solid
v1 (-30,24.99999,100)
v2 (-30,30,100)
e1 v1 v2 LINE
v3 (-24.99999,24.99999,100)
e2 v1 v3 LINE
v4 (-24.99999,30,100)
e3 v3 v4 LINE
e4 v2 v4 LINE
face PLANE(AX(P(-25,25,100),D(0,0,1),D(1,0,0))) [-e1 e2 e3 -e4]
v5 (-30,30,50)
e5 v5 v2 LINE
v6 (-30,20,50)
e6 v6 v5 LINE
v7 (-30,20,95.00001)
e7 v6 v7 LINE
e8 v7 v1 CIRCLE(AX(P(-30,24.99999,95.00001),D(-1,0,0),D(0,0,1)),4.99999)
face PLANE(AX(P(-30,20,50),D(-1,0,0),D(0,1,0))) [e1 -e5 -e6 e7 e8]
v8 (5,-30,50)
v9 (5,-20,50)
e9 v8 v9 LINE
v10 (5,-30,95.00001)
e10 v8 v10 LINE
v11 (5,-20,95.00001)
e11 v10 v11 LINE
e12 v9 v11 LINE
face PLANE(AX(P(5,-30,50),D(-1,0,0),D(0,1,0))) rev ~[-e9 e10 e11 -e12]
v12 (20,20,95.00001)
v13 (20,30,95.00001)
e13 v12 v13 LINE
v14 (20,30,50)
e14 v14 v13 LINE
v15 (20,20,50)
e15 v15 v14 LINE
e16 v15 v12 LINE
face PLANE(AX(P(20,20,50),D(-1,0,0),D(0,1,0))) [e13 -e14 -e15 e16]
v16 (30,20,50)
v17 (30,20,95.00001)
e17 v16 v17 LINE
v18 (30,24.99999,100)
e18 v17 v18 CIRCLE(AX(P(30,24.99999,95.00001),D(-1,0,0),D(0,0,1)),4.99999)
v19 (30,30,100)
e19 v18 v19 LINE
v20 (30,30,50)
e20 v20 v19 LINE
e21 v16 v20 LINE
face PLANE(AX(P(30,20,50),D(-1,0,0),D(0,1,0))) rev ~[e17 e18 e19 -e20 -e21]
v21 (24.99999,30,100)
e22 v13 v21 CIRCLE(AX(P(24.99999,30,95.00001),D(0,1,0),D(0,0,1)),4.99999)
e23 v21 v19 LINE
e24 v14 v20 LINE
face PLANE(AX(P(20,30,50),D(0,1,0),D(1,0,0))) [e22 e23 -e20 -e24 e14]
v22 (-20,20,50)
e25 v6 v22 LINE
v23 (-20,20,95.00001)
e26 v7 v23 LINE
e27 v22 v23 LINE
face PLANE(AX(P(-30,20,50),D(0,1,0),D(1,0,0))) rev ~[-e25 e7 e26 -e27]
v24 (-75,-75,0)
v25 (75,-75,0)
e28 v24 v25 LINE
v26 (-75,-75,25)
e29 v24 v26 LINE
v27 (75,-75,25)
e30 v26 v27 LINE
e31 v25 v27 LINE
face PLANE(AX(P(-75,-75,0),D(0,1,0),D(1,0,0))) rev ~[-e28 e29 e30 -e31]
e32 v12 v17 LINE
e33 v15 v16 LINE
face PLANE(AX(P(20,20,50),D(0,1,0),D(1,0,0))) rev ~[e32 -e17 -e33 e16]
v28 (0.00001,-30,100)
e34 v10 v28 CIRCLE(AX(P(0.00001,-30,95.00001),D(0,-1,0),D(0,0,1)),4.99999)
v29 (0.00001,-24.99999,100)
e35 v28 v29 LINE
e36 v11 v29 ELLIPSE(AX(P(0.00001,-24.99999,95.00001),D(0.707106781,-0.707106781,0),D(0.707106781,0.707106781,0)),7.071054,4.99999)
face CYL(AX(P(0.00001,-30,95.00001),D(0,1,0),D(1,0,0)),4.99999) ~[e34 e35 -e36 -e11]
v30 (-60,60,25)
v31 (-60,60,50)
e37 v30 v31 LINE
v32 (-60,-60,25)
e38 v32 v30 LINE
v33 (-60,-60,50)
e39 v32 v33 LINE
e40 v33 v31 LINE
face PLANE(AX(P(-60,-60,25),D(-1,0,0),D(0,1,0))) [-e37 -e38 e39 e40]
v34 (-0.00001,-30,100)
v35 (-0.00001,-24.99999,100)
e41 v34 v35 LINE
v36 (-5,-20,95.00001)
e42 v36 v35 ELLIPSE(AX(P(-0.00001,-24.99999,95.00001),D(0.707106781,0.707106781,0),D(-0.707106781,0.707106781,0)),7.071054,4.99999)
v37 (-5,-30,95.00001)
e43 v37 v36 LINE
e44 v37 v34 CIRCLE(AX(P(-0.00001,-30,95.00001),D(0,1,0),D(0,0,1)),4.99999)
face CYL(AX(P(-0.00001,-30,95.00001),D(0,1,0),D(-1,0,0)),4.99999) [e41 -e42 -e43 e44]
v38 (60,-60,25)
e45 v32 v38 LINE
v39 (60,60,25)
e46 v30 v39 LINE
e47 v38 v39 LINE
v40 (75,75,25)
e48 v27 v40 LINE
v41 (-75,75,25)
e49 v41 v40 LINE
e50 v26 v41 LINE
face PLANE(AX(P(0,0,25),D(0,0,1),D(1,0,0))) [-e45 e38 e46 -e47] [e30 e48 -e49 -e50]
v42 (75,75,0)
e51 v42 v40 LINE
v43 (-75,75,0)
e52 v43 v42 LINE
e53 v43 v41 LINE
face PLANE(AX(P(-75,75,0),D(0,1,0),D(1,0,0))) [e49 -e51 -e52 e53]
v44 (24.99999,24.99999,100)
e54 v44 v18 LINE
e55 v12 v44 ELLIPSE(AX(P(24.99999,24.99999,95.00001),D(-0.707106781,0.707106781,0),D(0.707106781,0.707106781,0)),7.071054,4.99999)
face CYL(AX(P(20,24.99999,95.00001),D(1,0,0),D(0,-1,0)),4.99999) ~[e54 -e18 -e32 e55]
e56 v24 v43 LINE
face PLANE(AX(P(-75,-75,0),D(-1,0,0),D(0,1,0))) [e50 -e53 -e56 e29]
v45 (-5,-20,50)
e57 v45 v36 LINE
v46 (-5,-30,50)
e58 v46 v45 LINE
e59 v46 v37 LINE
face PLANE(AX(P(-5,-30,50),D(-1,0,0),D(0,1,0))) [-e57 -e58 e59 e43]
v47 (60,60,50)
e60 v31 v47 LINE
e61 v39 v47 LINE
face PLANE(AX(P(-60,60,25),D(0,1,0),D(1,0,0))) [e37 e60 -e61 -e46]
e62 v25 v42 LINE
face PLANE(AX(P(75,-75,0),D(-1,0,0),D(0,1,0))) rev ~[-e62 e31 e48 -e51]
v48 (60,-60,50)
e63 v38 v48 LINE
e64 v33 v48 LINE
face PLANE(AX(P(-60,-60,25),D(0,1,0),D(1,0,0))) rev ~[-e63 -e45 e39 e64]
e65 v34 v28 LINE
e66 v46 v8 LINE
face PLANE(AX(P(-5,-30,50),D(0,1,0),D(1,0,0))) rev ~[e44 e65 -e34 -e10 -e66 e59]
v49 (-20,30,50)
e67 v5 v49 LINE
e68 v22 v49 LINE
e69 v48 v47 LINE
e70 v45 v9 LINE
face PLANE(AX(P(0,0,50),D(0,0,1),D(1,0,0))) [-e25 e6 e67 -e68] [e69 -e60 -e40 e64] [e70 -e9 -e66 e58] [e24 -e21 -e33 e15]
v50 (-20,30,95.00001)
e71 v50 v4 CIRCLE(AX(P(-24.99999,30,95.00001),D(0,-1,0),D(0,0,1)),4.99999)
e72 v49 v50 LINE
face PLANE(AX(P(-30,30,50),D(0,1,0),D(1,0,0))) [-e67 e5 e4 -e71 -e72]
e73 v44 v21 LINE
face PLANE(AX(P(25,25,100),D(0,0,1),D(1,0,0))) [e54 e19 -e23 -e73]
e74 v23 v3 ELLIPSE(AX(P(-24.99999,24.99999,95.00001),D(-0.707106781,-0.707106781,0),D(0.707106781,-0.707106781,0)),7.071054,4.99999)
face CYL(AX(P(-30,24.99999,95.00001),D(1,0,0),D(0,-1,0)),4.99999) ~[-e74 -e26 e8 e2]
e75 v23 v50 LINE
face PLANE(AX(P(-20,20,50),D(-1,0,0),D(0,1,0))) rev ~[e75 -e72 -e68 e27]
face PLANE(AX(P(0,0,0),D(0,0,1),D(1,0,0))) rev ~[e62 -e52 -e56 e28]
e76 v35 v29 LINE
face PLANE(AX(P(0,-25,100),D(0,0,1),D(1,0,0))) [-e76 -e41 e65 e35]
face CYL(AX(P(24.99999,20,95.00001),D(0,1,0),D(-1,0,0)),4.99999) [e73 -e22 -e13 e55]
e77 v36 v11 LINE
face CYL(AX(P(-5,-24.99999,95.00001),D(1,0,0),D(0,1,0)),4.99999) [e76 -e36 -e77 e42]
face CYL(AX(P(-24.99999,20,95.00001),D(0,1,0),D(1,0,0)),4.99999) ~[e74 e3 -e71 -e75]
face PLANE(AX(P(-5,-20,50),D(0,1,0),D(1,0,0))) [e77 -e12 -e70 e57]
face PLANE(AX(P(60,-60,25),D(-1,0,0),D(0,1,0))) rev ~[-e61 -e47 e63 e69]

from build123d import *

# Parameters (mm, degrees)
F0_W     = 150
F0_H     = 150
F1_DEPTH = 25
F2_W     = 120
F2_H     = 120
F3_DEPTH = 25
F4_W     = 10
F4_H     = 10
F5_DEPTH = 50
F6_R     = 4.99999


# Not quite as in the source:
# - a fillet or chamfer is up to 0.001 mm smaller than in the source, because OpenCascade refuses the exact size


with BuildPart() as f1:
    # F0 (on Top) → F1 (new body)
    with BuildSketch(Plane.XY):
        Rectangle(F0_W, F0_H)
    extrude(amount=F1_DEPTH)

    # F2 (on face) → F3 (join)
    with BuildSketch(Plane.XY.offset(25)):
        Rectangle(F2_W, F2_H)
    extrude(amount=F3_DEPTH)

    # F4 (on face) → F5 (join)
    with BuildSketch(Plane.XY.offset(50)):
        with Locations((0, -25)):
            Rectangle(F4_W, F4_H)
        with Locations((-25, 25)):
            Rectangle(F4_W, F4_H)
        with Locations((25, 25)):
            Rectangle(F4_W, F4_H)
    extrude(amount=F5_DEPTH)

    # F6 (radius 5 in the source; OpenCascade refuses exactly that, so slightly less here)
    f6_edges = [f1.edges().sort_by_distance(p)[0] for p in [
        (-25, 20, 100),
        (-20, 25, 100),
        (25, 20, 100),
        (20, 25, 100),
        (-5, -25, 100),
        (0, -20, 100),
        (5, -25, 100),
    ]]
    fillet(f6_edges, radius=F6_R)


solid = f1.part
